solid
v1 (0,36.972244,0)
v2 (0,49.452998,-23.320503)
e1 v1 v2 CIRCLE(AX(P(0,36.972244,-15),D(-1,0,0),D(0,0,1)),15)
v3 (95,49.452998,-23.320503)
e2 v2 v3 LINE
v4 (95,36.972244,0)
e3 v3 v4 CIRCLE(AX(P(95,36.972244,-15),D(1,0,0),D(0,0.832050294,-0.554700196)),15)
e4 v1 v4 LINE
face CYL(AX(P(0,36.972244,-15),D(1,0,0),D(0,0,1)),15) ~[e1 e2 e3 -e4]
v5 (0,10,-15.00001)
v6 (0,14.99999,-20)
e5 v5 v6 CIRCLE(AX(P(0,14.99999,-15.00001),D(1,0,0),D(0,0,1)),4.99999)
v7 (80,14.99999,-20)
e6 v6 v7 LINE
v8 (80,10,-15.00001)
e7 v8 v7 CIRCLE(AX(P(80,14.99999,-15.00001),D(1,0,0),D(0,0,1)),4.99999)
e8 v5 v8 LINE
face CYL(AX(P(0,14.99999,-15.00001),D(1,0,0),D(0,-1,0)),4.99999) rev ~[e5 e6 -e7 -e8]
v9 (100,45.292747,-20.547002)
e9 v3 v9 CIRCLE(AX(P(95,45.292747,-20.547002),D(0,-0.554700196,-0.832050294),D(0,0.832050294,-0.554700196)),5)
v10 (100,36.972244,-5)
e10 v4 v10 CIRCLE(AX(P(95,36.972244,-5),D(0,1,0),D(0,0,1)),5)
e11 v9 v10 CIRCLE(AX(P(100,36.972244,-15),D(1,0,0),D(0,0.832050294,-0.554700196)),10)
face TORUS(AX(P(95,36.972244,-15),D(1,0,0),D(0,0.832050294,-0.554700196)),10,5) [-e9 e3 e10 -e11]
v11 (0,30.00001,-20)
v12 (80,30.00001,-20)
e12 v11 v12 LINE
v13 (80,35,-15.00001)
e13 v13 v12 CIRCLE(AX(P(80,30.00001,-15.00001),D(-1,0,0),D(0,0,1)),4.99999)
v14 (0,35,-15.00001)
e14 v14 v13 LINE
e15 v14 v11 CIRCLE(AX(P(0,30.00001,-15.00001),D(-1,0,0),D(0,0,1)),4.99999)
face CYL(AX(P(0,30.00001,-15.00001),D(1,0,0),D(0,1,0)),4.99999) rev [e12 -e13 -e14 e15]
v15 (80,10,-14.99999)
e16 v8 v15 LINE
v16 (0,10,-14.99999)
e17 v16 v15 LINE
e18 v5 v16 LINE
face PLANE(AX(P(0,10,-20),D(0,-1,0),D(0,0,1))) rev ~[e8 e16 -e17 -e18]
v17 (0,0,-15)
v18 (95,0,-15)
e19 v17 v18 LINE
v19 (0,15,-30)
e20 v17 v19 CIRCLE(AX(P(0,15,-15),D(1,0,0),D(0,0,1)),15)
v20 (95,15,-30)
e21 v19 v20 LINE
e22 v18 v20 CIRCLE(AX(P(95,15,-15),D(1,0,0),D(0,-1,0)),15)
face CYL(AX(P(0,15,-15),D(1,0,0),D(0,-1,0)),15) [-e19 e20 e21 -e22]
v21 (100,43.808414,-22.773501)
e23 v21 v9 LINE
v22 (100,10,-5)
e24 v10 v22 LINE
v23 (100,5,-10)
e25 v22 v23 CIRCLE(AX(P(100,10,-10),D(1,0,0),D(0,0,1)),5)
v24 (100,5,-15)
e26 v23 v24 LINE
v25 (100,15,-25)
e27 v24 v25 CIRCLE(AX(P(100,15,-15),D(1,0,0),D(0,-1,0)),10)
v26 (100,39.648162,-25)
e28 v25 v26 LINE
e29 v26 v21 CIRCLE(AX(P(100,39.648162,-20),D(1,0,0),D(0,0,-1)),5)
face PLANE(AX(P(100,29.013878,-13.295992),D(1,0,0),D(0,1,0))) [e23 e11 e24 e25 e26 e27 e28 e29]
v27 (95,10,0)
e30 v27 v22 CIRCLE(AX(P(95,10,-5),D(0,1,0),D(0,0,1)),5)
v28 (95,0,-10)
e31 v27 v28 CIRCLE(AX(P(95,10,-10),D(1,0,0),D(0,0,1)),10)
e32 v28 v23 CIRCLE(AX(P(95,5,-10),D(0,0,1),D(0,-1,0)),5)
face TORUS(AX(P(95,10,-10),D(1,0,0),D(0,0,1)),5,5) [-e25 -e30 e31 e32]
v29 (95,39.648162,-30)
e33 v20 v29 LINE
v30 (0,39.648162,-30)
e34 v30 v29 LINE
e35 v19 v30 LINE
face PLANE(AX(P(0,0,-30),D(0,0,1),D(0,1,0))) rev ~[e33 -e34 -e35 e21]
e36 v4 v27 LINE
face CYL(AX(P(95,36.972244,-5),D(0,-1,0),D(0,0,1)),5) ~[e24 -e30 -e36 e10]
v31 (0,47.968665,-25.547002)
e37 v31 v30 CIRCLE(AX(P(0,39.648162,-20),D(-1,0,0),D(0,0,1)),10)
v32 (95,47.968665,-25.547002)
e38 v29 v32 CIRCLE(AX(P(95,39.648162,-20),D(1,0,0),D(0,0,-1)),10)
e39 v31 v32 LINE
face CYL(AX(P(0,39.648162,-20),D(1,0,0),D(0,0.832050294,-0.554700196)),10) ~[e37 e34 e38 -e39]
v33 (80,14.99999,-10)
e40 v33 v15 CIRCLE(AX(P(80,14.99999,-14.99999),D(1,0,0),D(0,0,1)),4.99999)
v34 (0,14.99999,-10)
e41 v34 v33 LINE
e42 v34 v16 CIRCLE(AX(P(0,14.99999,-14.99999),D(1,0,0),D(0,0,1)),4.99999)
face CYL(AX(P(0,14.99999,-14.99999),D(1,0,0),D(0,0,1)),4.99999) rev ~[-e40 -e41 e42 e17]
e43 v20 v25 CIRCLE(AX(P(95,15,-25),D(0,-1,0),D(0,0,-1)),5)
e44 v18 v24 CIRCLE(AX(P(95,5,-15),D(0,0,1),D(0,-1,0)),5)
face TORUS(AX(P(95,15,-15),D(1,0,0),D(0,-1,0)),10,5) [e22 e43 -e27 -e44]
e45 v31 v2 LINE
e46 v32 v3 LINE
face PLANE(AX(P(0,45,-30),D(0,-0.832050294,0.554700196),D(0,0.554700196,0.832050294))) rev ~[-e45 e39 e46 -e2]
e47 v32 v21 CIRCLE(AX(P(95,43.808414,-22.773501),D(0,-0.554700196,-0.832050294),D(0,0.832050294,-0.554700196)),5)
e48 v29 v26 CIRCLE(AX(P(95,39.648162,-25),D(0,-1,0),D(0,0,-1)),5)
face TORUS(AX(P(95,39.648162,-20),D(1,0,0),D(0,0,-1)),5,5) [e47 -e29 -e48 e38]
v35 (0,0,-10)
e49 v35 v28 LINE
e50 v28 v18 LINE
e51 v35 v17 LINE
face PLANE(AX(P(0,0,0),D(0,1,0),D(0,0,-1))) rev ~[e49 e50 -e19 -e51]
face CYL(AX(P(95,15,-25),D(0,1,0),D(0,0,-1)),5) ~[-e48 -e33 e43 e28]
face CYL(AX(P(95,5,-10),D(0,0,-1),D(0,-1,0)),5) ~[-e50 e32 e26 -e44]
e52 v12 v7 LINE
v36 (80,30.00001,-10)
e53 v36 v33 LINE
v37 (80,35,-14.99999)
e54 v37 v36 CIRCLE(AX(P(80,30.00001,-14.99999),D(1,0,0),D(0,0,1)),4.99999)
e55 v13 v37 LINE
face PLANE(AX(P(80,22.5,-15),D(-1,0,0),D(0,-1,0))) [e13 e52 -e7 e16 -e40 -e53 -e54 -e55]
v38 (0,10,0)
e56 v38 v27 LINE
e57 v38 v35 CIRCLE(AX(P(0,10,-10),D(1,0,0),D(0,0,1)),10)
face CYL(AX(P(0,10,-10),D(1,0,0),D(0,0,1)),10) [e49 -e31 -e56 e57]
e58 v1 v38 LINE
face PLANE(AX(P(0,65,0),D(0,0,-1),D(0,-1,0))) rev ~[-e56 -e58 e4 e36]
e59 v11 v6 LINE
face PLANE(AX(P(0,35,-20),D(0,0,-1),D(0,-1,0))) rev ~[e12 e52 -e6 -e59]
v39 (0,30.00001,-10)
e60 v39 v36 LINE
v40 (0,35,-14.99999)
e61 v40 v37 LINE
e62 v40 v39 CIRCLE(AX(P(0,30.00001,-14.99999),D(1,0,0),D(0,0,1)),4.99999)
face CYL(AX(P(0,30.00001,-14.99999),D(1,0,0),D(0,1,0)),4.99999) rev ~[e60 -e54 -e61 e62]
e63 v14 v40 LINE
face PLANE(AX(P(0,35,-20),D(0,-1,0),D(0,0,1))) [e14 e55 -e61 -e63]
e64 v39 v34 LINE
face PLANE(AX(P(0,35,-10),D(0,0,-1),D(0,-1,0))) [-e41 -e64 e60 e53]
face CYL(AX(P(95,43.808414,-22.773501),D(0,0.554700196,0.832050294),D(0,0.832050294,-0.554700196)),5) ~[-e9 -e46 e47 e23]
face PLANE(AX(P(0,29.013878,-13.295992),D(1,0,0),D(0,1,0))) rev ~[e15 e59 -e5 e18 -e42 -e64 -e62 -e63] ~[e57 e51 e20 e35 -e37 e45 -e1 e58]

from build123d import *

# Parameters (mm, degrees)
F1_DEPTH = 100
F2_W     = 25
F2_H     = 10
F3_DEPTH = 80
F4_R     = 4.99999
F5_R     = 15
F6_R     = 10
F7_R     = 5


# Not quite as in the source:
# - a fillet or chamfer is up to 0.001 mm smaller than in the source, because OpenCascade refuses the exact size


with BuildPart() as f1:
    # F0 (on Right) → F1 (new body)
    with BuildSketch(Plane.YZ):
        Polygon((65, 0), (0, 0), (0, -30), (45, -30), align=None)
    extrude(amount=F1_DEPTH)

    # F2 (on face) → F3 (cut)
    with BuildSketch(Plane(origin=(0, 0, 0), x_dir=(0, -1, 0), z_dir=(-1, 0, 0))):
        with Locations((-22.5, -15)):
            Rectangle(F2_W, F2_H)
    extrude(amount=-F3_DEPTH, mode=Mode.SUBTRACT)

    # F4 (radius 5 in the source; OpenCascade refuses exactly that, so slightly less here)
    f4_edges = [f1.edges().sort_by_distance(p)[0] for p in [
        (40, 10, -10),
        (40, 35, -10),
        (40, 35, -20),
        (40, 10, -20),
    ]]
    fillet(f4_edges, radius=F4_R)

    # F5
    f5_edges = [f1.edges().sort_by_distance(p)[0] for p in [
        (50, 65, 0),
        (50, 0, -30),
    ]]
    fillet(f5_edges, radius=F5_R)

    # F6
    f6_edges = [f1.edges().sort_by_distance(p)[0] for p in [
        (50, 0, 0),
        (50, 45, -30),
    ]]
    fillet(f6_edges, radius=F6_R)

    # F7
    f7_edges = [f1.edges().sort_by_distance(p)[0] for p in [
        (100, 23.486122, 0),
    ]]
    fillet(f7_edges, radius=F7_R)


solid = f1.part
